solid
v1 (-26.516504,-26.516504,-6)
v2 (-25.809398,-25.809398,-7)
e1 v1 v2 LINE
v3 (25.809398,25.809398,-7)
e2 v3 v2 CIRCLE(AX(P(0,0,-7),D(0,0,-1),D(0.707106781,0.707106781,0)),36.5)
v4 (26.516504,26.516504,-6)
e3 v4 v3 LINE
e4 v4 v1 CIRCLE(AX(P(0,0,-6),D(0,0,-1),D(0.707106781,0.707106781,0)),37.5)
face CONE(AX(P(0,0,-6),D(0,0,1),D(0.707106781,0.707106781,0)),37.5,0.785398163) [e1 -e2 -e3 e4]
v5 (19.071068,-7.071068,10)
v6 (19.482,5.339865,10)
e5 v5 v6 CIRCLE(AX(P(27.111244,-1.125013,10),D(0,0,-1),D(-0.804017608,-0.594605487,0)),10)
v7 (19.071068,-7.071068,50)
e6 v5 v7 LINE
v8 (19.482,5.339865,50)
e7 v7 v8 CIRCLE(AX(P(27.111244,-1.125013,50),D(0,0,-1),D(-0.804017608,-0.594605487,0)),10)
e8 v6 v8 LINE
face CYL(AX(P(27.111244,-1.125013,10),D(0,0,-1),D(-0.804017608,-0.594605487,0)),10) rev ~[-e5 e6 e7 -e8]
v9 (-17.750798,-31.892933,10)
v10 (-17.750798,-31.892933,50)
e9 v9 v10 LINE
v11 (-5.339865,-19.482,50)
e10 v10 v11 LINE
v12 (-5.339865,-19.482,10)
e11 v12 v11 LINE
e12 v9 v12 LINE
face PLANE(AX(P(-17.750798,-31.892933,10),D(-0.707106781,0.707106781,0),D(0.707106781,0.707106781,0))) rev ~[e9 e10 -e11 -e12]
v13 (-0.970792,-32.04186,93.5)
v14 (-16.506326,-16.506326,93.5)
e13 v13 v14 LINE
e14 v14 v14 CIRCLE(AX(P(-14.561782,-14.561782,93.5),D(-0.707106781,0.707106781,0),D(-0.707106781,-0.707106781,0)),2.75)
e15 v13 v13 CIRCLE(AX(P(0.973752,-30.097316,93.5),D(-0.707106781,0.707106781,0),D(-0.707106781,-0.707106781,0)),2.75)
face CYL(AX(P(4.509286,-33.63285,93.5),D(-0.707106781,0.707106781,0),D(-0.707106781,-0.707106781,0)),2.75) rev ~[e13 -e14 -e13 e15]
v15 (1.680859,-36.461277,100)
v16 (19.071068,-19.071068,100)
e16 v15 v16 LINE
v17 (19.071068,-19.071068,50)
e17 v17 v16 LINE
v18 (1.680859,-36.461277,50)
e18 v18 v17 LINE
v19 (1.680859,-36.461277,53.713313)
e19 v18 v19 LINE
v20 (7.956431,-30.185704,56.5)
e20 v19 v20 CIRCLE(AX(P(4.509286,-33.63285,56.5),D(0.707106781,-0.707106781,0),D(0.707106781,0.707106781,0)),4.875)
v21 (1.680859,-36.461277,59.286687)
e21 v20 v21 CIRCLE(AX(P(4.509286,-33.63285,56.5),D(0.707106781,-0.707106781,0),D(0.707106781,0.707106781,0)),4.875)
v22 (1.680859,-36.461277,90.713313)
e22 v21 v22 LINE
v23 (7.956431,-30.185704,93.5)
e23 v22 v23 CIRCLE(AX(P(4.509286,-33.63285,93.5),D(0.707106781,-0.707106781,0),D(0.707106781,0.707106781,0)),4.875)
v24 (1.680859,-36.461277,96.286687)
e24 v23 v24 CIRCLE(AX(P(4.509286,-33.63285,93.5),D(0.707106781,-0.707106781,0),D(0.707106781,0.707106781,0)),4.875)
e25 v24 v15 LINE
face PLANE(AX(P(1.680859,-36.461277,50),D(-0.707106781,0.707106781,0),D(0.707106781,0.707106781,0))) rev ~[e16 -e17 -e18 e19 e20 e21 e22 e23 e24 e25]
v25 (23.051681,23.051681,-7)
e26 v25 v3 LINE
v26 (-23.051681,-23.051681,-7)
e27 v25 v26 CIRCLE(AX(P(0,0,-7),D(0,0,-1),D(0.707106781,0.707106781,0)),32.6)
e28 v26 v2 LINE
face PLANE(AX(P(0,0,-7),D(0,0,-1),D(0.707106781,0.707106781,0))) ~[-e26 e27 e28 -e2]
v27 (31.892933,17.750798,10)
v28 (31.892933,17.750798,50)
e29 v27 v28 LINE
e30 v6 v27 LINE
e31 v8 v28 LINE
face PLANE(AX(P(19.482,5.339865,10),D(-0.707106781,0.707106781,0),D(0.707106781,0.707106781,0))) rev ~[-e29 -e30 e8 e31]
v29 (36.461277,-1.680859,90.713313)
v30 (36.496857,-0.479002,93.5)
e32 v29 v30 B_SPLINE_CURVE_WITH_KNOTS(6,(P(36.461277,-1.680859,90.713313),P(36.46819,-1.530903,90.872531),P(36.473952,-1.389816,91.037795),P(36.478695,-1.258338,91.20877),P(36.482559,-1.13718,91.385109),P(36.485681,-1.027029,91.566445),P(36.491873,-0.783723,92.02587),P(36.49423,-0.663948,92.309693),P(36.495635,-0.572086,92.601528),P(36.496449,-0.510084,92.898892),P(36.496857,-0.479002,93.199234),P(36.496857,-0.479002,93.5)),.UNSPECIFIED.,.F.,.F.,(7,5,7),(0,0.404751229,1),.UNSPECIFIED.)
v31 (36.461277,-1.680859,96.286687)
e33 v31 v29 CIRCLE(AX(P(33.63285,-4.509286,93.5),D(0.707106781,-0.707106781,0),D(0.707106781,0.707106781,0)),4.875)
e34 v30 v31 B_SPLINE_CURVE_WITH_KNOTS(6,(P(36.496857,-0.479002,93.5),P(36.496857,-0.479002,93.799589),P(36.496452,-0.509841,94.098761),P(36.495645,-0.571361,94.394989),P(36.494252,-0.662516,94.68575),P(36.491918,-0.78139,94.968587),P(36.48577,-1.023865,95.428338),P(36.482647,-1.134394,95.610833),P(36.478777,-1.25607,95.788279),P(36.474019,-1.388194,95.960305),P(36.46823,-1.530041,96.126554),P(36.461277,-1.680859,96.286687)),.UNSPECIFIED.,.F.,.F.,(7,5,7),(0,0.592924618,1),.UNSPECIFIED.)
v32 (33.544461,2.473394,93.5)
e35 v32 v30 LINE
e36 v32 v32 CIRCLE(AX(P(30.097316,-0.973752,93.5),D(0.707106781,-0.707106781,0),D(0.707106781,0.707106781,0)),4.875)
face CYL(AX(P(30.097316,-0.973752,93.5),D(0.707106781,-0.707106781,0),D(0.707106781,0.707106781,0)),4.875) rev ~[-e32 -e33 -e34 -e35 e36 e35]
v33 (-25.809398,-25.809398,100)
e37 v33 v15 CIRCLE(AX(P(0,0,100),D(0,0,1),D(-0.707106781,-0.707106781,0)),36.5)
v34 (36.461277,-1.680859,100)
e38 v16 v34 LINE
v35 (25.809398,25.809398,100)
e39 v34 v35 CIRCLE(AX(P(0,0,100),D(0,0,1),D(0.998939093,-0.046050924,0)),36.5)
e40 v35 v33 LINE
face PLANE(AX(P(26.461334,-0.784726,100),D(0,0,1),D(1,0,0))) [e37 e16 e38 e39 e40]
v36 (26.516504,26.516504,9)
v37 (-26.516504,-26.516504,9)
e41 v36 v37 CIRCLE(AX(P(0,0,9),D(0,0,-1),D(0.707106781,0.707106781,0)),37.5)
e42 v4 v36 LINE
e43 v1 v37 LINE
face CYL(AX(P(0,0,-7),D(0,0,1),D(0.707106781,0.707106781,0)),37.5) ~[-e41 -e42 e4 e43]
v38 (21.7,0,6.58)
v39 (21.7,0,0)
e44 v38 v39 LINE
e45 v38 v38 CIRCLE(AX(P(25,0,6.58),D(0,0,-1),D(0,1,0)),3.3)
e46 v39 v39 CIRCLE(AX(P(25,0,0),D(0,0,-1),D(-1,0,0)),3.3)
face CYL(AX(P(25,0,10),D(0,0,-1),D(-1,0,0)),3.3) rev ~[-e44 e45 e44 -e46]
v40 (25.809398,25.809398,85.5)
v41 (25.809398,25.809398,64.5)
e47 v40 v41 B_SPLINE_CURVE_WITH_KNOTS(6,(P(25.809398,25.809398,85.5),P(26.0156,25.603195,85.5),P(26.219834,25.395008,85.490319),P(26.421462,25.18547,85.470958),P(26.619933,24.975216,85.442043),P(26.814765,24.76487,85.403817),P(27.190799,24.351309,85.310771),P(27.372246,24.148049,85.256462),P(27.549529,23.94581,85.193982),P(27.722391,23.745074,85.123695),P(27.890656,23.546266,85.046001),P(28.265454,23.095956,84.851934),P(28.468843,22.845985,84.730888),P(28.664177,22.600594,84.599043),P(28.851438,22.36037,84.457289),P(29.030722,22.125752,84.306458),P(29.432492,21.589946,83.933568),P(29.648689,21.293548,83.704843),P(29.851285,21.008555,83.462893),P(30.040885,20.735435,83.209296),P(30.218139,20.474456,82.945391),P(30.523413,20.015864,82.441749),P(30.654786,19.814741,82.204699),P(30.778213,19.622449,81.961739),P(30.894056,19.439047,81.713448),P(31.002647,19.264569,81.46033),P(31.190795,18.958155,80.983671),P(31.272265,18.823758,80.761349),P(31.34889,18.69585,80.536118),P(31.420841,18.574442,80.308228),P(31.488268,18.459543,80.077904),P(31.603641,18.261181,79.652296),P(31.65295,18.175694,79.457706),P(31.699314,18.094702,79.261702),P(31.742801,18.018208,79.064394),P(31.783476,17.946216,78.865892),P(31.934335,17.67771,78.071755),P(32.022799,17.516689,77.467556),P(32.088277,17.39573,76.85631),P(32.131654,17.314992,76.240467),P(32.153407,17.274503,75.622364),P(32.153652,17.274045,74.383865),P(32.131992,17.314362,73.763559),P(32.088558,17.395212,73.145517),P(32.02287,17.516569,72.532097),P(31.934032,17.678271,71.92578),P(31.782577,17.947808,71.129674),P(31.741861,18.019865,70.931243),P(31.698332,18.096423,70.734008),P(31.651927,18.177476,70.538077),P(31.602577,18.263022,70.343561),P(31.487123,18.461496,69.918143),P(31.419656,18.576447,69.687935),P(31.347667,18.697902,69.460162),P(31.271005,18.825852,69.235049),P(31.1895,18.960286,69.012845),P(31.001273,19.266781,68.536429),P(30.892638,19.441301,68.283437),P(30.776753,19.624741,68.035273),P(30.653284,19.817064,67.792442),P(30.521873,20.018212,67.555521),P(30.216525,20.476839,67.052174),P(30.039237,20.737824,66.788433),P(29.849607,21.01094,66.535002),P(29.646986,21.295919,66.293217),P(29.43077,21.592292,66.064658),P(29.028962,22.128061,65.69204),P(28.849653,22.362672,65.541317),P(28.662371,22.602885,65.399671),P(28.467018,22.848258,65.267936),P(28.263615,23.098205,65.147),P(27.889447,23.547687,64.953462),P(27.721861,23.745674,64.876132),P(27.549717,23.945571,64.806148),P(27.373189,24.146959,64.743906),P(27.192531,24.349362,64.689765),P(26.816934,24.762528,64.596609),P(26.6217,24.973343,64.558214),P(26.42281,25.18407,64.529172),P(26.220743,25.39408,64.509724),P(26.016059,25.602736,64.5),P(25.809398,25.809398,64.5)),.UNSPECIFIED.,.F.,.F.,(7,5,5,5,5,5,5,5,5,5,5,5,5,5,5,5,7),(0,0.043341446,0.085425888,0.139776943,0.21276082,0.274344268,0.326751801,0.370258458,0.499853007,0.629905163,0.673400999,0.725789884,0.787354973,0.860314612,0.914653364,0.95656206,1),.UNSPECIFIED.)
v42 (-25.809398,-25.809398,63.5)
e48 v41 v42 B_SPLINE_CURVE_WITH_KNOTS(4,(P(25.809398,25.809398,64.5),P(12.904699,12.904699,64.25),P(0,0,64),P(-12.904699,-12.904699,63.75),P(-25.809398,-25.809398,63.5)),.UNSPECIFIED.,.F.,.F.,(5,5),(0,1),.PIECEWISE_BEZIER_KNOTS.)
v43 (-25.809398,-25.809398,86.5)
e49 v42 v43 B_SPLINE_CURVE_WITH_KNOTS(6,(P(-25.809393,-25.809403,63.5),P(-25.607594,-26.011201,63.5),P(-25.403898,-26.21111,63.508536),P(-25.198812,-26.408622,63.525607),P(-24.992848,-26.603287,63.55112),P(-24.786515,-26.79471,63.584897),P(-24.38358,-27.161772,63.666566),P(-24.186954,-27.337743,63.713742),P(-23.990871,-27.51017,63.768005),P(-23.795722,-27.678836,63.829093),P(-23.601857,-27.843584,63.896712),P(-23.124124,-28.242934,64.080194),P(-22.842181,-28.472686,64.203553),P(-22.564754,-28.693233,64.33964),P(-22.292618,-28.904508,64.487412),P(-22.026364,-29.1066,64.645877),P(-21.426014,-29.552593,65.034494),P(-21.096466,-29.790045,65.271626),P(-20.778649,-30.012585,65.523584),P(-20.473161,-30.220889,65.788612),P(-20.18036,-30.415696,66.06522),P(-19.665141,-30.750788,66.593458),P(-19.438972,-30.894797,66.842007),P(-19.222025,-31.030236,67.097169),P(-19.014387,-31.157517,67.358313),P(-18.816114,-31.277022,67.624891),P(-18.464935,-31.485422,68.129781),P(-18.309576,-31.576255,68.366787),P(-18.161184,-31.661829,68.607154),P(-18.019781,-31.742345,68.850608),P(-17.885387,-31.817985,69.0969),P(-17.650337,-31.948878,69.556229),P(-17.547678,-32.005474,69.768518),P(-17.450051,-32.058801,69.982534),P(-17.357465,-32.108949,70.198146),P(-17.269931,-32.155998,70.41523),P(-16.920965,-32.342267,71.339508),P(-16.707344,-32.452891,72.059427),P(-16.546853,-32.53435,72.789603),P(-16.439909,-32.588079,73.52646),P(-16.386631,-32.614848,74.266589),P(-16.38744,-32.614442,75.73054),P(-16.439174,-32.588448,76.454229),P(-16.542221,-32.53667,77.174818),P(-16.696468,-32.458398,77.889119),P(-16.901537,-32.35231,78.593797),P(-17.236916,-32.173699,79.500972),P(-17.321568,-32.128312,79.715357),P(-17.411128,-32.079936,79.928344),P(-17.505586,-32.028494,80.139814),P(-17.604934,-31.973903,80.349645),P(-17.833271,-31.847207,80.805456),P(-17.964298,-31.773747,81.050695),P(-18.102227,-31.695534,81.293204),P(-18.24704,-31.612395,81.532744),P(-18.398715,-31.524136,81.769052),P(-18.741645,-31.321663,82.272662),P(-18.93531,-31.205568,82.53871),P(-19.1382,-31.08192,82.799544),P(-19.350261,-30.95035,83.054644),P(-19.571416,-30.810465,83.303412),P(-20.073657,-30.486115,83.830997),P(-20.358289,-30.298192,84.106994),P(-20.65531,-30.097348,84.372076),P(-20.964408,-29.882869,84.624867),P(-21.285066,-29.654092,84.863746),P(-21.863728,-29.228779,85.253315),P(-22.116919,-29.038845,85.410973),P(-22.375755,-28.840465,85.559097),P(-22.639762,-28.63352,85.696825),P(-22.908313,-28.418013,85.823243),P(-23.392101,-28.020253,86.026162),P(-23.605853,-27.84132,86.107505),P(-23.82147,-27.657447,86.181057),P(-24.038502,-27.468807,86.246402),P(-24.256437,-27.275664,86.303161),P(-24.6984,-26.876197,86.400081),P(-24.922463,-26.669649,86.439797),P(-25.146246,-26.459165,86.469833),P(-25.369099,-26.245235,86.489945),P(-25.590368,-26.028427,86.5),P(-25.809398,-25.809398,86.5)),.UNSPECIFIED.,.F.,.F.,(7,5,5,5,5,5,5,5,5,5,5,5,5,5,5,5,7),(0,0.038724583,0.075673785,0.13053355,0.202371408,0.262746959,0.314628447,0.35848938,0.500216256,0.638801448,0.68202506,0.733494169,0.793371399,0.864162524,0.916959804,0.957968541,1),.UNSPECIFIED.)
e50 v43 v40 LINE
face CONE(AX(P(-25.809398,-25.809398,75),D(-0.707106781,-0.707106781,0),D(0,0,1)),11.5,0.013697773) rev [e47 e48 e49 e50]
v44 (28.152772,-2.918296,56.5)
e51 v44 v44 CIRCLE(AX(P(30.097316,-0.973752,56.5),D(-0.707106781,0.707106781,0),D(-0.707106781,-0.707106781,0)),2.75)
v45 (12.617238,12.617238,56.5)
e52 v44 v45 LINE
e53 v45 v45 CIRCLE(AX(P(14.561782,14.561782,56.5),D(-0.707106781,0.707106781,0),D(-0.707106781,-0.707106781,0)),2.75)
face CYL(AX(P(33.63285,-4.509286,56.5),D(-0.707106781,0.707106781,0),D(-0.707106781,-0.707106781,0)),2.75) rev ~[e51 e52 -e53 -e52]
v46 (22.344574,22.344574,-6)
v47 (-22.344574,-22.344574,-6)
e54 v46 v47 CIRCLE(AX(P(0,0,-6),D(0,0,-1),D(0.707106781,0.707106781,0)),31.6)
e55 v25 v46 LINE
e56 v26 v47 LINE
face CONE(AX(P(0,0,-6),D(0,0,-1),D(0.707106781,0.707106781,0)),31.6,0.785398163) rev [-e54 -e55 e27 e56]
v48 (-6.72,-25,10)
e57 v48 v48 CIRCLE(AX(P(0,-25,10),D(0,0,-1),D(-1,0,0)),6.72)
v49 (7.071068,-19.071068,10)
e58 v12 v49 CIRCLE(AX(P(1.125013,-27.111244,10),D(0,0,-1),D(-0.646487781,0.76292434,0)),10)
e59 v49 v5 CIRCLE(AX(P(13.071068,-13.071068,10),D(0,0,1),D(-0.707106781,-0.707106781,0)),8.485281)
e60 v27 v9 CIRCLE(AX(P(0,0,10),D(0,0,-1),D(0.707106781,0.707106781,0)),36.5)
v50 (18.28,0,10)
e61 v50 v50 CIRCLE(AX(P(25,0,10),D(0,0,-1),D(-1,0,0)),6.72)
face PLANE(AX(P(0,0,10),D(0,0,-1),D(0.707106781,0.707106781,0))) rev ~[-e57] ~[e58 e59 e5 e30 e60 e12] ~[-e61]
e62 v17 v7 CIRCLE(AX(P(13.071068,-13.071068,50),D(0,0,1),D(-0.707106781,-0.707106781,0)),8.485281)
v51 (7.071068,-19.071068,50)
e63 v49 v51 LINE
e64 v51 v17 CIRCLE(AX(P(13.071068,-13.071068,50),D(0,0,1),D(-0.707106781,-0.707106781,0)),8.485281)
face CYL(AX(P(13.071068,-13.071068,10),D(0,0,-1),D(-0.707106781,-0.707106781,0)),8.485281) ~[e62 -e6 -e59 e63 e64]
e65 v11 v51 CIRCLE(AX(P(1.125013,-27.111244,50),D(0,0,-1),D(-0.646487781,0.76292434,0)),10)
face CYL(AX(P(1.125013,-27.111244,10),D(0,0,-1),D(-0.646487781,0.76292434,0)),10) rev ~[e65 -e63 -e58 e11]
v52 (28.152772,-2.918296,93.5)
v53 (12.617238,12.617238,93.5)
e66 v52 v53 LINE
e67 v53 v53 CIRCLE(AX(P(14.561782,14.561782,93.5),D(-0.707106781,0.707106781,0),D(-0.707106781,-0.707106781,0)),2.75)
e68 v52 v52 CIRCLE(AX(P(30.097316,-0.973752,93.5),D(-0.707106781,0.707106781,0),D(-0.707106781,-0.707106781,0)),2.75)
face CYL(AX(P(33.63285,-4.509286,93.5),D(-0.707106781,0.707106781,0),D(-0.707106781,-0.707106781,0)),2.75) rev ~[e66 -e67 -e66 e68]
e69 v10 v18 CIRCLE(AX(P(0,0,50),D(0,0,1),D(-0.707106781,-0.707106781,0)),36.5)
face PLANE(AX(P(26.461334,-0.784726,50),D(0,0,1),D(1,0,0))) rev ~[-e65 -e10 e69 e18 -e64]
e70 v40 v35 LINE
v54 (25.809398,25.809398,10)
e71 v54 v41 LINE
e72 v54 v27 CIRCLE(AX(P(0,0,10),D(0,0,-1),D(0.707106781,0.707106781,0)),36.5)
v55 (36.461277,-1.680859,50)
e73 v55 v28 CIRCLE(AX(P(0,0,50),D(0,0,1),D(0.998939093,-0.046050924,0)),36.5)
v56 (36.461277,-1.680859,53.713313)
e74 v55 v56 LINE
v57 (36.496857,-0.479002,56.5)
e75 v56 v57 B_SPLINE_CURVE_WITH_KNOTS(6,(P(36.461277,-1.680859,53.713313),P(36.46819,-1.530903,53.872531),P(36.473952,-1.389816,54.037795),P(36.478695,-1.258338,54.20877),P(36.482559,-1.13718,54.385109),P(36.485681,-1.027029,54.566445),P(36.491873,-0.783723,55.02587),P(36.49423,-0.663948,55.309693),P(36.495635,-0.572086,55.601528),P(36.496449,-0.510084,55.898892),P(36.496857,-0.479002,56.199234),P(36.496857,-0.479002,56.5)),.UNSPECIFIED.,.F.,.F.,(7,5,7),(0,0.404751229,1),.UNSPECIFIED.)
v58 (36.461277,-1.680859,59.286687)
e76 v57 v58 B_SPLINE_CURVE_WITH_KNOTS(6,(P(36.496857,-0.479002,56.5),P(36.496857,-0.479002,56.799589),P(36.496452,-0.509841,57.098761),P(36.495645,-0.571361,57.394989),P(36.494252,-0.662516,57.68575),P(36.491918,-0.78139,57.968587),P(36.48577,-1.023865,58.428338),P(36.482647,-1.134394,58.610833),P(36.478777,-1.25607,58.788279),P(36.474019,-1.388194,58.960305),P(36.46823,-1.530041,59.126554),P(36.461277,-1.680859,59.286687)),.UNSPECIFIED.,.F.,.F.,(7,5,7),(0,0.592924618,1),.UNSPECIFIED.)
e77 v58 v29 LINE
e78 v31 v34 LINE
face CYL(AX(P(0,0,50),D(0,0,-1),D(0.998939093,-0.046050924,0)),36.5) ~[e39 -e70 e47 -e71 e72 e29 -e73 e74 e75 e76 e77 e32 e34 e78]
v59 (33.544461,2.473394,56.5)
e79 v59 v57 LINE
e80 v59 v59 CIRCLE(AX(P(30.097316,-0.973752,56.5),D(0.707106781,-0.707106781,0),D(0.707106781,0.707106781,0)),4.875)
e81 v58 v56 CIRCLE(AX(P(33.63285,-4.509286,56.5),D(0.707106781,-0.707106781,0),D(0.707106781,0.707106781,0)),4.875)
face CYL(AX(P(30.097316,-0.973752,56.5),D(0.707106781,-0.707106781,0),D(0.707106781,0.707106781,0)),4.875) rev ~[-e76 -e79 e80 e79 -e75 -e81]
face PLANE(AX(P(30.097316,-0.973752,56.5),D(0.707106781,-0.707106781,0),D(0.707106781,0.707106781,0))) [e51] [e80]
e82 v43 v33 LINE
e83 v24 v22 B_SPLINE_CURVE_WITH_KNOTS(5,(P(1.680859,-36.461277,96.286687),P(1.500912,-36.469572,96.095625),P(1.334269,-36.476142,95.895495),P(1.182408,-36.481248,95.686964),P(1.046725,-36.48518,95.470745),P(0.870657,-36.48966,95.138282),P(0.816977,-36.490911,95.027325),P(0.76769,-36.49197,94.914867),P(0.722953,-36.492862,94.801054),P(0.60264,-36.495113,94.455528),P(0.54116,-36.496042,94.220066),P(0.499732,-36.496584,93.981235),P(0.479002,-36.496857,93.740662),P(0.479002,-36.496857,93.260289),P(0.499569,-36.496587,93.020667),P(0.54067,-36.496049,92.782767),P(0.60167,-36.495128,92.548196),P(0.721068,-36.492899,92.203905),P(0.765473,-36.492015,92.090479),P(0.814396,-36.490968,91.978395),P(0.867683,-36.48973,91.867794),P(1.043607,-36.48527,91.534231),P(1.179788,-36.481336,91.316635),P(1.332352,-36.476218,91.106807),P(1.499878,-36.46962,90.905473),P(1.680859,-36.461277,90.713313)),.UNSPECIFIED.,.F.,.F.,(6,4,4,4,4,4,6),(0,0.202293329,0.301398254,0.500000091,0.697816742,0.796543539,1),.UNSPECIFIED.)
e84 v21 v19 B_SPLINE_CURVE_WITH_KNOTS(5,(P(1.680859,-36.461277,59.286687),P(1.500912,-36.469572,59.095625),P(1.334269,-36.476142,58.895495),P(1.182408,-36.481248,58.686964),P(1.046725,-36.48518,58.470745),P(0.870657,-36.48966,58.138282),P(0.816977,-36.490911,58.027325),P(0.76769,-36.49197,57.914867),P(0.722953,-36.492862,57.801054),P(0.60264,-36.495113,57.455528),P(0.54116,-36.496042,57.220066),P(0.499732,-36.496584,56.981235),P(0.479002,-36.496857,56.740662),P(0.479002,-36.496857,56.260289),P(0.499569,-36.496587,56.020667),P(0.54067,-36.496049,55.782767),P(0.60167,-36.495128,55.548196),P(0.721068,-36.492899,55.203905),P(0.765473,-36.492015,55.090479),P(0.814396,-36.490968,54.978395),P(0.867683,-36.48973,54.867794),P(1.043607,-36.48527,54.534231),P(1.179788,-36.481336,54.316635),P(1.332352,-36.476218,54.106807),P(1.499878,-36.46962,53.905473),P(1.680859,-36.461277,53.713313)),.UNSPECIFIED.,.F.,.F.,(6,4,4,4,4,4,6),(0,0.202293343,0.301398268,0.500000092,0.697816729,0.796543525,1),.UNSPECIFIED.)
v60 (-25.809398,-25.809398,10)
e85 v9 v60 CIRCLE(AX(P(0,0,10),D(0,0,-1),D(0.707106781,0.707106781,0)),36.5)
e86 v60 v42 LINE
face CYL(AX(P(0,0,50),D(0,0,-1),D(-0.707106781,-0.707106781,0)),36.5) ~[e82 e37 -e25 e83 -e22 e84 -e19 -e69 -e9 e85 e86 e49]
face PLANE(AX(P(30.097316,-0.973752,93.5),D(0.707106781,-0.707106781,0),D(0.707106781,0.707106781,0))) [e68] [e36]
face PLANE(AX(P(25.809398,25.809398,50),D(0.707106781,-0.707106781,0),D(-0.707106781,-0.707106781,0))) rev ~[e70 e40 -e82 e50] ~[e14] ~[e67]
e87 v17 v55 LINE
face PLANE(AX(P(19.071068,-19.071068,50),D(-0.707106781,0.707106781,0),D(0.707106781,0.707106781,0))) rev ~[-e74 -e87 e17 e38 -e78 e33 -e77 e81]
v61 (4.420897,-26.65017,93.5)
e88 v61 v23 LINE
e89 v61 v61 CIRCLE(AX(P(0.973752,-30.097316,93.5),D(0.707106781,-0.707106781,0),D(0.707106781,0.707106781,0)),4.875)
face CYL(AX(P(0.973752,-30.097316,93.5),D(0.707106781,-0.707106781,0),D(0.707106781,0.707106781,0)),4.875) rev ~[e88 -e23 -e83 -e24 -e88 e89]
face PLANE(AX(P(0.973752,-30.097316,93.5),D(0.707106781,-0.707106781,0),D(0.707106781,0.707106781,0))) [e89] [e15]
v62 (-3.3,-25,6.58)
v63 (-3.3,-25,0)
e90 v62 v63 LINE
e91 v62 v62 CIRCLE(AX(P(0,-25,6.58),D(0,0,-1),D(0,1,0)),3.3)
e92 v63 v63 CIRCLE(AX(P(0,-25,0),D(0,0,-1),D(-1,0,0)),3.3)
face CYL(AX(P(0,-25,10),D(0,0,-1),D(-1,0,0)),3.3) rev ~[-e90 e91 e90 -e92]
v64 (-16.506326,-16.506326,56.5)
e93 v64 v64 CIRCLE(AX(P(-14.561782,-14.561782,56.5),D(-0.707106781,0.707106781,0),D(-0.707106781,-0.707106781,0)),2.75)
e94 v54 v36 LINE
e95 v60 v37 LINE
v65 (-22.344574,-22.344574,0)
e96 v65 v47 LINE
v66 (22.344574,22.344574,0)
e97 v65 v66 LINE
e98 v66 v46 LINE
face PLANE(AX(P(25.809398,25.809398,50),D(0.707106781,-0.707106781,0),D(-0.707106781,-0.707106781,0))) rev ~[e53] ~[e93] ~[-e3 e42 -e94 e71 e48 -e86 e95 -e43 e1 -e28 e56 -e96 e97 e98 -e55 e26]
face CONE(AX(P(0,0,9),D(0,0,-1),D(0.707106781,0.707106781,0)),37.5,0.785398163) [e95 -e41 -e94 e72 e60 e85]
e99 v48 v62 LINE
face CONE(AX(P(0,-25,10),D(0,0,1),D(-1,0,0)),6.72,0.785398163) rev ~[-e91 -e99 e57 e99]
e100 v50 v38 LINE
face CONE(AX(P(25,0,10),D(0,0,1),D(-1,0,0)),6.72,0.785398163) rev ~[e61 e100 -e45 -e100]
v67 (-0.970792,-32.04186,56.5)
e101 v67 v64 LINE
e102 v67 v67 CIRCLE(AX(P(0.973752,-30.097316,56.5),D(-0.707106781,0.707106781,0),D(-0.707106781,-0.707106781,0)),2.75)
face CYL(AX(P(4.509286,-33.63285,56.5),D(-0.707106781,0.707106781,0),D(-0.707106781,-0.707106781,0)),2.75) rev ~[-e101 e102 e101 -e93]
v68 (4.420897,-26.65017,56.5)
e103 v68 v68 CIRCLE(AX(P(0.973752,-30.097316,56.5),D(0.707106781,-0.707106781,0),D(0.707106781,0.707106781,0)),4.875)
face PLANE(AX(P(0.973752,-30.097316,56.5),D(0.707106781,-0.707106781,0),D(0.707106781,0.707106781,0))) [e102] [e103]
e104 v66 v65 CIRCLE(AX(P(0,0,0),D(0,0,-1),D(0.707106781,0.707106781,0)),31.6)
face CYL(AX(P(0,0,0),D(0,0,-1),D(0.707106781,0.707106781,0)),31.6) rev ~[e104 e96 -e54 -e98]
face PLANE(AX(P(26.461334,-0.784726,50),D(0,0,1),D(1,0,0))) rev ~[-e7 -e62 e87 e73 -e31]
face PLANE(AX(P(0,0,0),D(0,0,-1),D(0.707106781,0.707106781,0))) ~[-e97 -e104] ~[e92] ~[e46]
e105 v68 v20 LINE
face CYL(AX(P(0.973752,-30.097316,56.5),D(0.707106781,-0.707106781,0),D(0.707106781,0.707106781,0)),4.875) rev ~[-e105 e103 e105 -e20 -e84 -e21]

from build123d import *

# Parameters (mm, degrees)
F1_ANGLE_BACK   = 45
F1_ANGLE        = 180
F2_SIZE         = 1
F4_D            = 6.6
F4_CSINK_D      = 13.44
F4_CSINK_ANGLE  = 90
F6_DEPTH        = 40
F8_DEPTH        = 50
F12_D           = 5.5
F12_CBORE_D     = 9.75
F12_CBORE_DEPTH = 5


# Not quite as in the source:
# - a feature names something its author has since deleted; it is built from what else it names


with BuildPart() as f1:
    # F0 (on Front) → F1 (revolve)
    with BuildSketch(Plane.XZ, mode=Mode.PRIVATE) as f1_sk:
        Polygon((0, 10), (0, 0), (31.6, 0), (31.6, -7), (37.5, -7), (37.5, 10), align=None)
    revolve(f1_sk.sketch.rotate(Axis((0, 0, 5), (0, 0, -1)), -F1_ANGLE_BACK), axis=Axis((0, 0, 5), (0, 0, -1)), revolution_arc=F1_ANGLE)

    # F2
    f2_edges = [f1.edges().sort_by_distance(p)[0] for p in [
        (22.344574, -22.344574, -7),
        (26.516504, -26.516504, -7),
        (26.516504, -26.516504, 10),
    ]]
    chamfer(f2_edges, length=F2_SIZE)

    # F4 (through all)
    with Locations(Plane.XY.offset(10)):
        with Locations((25, 0), (0, -25)):
            CounterSinkHole(F4_D / 2, F4_CSINK_D / 2, counter_sink_angle=F4_CSINK_ANGLE)

    # F5 (on face) → F6 (join)
    with BuildSketch(Plane.XY.offset(10)):
        with BuildLine():
            Line((19.4820004924, 5.3398648686), (7.0710678119, -7.0710678119))
            Line((7.0710678119, -7.0710678119), (-5.3398648686, -19.4820004924))
            ThreePointArc((-5.3398648686, -19.4820004924), (0.79408889, -17.1167209324), (7.0710678119, -19.0710678119))
            ThreePointArc((7.0710678119, -19.0710678119), (19.0710678119, -19.0710678119), (19.0710678119, -7.0710678119))
            ThreePointArc((19.0710678119, -7.0710678119), (17.1167209324, -0.79408889), (19.4820004924, 5.3398648686))
        make_face()
        with BuildLine():
            Line((7.0710678119, -7.0710678119), (0, 0))
            Line((0, 0), (-25.8093975133, -25.8093975133))
            ThreePointArc((-25.8093975133, -25.8093975133), (-21.9914756212, -29.1311688746), (-17.7507975491, -31.8929331729))
            Line((-17.7507975491, -31.8929331729), (-5.3398648686, -19.4820004924))
            Line((-5.3398648686, -19.4820004924), (7.0710678119, -7.0710678119))
        make_face()
        with BuildLine():
            Line((25.8093975133, 25.8093975133), (0, 0))
            Line((0, 0), (7.0710678119, -7.0710678119))
            Line((7.0710678119, -7.0710678119), (19.4820004924, 5.3398648686))
            Line((19.4820004924, 5.3398648686), (31.8929331729, 17.7507975491))
            ThreePointArc((31.8929331729, 17.7507975491), (29.1311688746, 21.9914756212), (25.8093975133, 25.8093975133))
        make_face()
    extrude(amount=F6_DEPTH)

    # F7 (on face) → F8 (join)
    with BuildSketch(Plane.XY.offset(50)):
        with BuildLine():
            ThreePointArc((36.4612769111, -1.6808587126), (35.531279534, 8.3533331479), (31.8929331729, 17.7507975491))
            Line((31.8929331729, 17.7507975491), (19.4820004924, 5.3398648686))
            ThreePointArc((19.4820004924, 5.3398648686), (17.1167209324, -0.79408889), (19.0710678119, -7.0710678119))
            ThreePointArc((19.0710678119, -7.0710678119), (21.5563491861, -13.0710678119), (19.0710678119, -19.0710678119))
            Line((19.0710678119, -19.0710678119), (36.4612769111, -1.6808587126))
        make_face()
        with BuildLine():
            Line((-5.3398648686, -19.4820004924), (-17.7507975491, -31.8929331729))
            ThreePointArc((-17.7507975491, -31.8929331729), (-8.3533331479, -35.531279534), (1.6808587126, -36.4612769111))
            Line((1.6808587126, -36.4612769111), (19.0710678119, -19.0710678119))
            ThreePointArc((19.0710678119, -19.0710678119), (13.0710678119, -21.5563491861), (7.0710678119, -19.0710678119))
            ThreePointArc((7.0710678119, -19.0710678119), (0.79408889, -17.1167209324), (-5.3398648686, -19.4820004924))
        make_face()
        with BuildLine():
            ThreePointArc((31.8929331729, 17.7507975491), (29.1311688746, 21.9914756212), (25.8093975133, 25.8093975133))
            Line((25.8093975133, 25.8093975133), (-25.8093975133, -25.8093975133))
            ThreePointArc((-25.8093975133, -25.8093975133), (-21.9914756212, -29.1311688746), (-17.7507975491, -31.8929331729))
            Line((-17.7507975491, -31.8929331729), (-5.3398648686, -19.4820004924))
            ThreePointArc((-5.3398648686, -19.4820004924), (0.79408889, -17.1167209324), (7.0710678119, -19.0710678119))
            ThreePointArc((7.0710678119, -19.0710678119), (13.0710678119, -21.5563491861), (19.0710678119, -19.0710678119))
            ThreePointArc((19.0710678119, -19.0710678119), (21.5563491861, -13.0710678119), (19.0710678119, -7.0710678119))
            ThreePointArc((19.0710678119, -7.0710678119), (17.1167209324, -0.79408889), (19.4820004924, 5.3398648686))
            Line((19.4820004924, 5.3398648686), (31.8929331729, 17.7507975491))
        make_face()
    extrude(amount=F8_DEPTH)

    # F9 (on face) → F10 (revolve, cut)
    with BuildSketch(Plane(origin=(0, 0, 0), x_dir=(-0.7071067812, -0.7071067812, 0), z_dir=(-0.7071067812, 0.7071067812, 0))):
        Polygon((36.5, 86.5), (-36.5, 85.5), (-36.5, 75), (36.5, 75), align=None)
    revolve(axis=Axis((0, 0, 75), (-0.7071067812, -0.7071067812, 0)), mode=Mode.SUBTRACT)

    # F12 (through all)
    with Locations(Plane(origin=(19.0710678119, -19.0710678119, 0), x_dir=(0.7071067812, 0.7071067812, 0), z_dir=(0.7071067812, -0.7071067812, 0))):
        with Locations((20.5934695606, 93.5), (20.5934695606, 56.5), (-20.5934695606, 56.5), (-20.5934695606, 93.5)):
            CounterBoreHole(F12_D / 2, F12_CBORE_D / 2, F12_CBORE_DEPTH)


solid = f1.part
